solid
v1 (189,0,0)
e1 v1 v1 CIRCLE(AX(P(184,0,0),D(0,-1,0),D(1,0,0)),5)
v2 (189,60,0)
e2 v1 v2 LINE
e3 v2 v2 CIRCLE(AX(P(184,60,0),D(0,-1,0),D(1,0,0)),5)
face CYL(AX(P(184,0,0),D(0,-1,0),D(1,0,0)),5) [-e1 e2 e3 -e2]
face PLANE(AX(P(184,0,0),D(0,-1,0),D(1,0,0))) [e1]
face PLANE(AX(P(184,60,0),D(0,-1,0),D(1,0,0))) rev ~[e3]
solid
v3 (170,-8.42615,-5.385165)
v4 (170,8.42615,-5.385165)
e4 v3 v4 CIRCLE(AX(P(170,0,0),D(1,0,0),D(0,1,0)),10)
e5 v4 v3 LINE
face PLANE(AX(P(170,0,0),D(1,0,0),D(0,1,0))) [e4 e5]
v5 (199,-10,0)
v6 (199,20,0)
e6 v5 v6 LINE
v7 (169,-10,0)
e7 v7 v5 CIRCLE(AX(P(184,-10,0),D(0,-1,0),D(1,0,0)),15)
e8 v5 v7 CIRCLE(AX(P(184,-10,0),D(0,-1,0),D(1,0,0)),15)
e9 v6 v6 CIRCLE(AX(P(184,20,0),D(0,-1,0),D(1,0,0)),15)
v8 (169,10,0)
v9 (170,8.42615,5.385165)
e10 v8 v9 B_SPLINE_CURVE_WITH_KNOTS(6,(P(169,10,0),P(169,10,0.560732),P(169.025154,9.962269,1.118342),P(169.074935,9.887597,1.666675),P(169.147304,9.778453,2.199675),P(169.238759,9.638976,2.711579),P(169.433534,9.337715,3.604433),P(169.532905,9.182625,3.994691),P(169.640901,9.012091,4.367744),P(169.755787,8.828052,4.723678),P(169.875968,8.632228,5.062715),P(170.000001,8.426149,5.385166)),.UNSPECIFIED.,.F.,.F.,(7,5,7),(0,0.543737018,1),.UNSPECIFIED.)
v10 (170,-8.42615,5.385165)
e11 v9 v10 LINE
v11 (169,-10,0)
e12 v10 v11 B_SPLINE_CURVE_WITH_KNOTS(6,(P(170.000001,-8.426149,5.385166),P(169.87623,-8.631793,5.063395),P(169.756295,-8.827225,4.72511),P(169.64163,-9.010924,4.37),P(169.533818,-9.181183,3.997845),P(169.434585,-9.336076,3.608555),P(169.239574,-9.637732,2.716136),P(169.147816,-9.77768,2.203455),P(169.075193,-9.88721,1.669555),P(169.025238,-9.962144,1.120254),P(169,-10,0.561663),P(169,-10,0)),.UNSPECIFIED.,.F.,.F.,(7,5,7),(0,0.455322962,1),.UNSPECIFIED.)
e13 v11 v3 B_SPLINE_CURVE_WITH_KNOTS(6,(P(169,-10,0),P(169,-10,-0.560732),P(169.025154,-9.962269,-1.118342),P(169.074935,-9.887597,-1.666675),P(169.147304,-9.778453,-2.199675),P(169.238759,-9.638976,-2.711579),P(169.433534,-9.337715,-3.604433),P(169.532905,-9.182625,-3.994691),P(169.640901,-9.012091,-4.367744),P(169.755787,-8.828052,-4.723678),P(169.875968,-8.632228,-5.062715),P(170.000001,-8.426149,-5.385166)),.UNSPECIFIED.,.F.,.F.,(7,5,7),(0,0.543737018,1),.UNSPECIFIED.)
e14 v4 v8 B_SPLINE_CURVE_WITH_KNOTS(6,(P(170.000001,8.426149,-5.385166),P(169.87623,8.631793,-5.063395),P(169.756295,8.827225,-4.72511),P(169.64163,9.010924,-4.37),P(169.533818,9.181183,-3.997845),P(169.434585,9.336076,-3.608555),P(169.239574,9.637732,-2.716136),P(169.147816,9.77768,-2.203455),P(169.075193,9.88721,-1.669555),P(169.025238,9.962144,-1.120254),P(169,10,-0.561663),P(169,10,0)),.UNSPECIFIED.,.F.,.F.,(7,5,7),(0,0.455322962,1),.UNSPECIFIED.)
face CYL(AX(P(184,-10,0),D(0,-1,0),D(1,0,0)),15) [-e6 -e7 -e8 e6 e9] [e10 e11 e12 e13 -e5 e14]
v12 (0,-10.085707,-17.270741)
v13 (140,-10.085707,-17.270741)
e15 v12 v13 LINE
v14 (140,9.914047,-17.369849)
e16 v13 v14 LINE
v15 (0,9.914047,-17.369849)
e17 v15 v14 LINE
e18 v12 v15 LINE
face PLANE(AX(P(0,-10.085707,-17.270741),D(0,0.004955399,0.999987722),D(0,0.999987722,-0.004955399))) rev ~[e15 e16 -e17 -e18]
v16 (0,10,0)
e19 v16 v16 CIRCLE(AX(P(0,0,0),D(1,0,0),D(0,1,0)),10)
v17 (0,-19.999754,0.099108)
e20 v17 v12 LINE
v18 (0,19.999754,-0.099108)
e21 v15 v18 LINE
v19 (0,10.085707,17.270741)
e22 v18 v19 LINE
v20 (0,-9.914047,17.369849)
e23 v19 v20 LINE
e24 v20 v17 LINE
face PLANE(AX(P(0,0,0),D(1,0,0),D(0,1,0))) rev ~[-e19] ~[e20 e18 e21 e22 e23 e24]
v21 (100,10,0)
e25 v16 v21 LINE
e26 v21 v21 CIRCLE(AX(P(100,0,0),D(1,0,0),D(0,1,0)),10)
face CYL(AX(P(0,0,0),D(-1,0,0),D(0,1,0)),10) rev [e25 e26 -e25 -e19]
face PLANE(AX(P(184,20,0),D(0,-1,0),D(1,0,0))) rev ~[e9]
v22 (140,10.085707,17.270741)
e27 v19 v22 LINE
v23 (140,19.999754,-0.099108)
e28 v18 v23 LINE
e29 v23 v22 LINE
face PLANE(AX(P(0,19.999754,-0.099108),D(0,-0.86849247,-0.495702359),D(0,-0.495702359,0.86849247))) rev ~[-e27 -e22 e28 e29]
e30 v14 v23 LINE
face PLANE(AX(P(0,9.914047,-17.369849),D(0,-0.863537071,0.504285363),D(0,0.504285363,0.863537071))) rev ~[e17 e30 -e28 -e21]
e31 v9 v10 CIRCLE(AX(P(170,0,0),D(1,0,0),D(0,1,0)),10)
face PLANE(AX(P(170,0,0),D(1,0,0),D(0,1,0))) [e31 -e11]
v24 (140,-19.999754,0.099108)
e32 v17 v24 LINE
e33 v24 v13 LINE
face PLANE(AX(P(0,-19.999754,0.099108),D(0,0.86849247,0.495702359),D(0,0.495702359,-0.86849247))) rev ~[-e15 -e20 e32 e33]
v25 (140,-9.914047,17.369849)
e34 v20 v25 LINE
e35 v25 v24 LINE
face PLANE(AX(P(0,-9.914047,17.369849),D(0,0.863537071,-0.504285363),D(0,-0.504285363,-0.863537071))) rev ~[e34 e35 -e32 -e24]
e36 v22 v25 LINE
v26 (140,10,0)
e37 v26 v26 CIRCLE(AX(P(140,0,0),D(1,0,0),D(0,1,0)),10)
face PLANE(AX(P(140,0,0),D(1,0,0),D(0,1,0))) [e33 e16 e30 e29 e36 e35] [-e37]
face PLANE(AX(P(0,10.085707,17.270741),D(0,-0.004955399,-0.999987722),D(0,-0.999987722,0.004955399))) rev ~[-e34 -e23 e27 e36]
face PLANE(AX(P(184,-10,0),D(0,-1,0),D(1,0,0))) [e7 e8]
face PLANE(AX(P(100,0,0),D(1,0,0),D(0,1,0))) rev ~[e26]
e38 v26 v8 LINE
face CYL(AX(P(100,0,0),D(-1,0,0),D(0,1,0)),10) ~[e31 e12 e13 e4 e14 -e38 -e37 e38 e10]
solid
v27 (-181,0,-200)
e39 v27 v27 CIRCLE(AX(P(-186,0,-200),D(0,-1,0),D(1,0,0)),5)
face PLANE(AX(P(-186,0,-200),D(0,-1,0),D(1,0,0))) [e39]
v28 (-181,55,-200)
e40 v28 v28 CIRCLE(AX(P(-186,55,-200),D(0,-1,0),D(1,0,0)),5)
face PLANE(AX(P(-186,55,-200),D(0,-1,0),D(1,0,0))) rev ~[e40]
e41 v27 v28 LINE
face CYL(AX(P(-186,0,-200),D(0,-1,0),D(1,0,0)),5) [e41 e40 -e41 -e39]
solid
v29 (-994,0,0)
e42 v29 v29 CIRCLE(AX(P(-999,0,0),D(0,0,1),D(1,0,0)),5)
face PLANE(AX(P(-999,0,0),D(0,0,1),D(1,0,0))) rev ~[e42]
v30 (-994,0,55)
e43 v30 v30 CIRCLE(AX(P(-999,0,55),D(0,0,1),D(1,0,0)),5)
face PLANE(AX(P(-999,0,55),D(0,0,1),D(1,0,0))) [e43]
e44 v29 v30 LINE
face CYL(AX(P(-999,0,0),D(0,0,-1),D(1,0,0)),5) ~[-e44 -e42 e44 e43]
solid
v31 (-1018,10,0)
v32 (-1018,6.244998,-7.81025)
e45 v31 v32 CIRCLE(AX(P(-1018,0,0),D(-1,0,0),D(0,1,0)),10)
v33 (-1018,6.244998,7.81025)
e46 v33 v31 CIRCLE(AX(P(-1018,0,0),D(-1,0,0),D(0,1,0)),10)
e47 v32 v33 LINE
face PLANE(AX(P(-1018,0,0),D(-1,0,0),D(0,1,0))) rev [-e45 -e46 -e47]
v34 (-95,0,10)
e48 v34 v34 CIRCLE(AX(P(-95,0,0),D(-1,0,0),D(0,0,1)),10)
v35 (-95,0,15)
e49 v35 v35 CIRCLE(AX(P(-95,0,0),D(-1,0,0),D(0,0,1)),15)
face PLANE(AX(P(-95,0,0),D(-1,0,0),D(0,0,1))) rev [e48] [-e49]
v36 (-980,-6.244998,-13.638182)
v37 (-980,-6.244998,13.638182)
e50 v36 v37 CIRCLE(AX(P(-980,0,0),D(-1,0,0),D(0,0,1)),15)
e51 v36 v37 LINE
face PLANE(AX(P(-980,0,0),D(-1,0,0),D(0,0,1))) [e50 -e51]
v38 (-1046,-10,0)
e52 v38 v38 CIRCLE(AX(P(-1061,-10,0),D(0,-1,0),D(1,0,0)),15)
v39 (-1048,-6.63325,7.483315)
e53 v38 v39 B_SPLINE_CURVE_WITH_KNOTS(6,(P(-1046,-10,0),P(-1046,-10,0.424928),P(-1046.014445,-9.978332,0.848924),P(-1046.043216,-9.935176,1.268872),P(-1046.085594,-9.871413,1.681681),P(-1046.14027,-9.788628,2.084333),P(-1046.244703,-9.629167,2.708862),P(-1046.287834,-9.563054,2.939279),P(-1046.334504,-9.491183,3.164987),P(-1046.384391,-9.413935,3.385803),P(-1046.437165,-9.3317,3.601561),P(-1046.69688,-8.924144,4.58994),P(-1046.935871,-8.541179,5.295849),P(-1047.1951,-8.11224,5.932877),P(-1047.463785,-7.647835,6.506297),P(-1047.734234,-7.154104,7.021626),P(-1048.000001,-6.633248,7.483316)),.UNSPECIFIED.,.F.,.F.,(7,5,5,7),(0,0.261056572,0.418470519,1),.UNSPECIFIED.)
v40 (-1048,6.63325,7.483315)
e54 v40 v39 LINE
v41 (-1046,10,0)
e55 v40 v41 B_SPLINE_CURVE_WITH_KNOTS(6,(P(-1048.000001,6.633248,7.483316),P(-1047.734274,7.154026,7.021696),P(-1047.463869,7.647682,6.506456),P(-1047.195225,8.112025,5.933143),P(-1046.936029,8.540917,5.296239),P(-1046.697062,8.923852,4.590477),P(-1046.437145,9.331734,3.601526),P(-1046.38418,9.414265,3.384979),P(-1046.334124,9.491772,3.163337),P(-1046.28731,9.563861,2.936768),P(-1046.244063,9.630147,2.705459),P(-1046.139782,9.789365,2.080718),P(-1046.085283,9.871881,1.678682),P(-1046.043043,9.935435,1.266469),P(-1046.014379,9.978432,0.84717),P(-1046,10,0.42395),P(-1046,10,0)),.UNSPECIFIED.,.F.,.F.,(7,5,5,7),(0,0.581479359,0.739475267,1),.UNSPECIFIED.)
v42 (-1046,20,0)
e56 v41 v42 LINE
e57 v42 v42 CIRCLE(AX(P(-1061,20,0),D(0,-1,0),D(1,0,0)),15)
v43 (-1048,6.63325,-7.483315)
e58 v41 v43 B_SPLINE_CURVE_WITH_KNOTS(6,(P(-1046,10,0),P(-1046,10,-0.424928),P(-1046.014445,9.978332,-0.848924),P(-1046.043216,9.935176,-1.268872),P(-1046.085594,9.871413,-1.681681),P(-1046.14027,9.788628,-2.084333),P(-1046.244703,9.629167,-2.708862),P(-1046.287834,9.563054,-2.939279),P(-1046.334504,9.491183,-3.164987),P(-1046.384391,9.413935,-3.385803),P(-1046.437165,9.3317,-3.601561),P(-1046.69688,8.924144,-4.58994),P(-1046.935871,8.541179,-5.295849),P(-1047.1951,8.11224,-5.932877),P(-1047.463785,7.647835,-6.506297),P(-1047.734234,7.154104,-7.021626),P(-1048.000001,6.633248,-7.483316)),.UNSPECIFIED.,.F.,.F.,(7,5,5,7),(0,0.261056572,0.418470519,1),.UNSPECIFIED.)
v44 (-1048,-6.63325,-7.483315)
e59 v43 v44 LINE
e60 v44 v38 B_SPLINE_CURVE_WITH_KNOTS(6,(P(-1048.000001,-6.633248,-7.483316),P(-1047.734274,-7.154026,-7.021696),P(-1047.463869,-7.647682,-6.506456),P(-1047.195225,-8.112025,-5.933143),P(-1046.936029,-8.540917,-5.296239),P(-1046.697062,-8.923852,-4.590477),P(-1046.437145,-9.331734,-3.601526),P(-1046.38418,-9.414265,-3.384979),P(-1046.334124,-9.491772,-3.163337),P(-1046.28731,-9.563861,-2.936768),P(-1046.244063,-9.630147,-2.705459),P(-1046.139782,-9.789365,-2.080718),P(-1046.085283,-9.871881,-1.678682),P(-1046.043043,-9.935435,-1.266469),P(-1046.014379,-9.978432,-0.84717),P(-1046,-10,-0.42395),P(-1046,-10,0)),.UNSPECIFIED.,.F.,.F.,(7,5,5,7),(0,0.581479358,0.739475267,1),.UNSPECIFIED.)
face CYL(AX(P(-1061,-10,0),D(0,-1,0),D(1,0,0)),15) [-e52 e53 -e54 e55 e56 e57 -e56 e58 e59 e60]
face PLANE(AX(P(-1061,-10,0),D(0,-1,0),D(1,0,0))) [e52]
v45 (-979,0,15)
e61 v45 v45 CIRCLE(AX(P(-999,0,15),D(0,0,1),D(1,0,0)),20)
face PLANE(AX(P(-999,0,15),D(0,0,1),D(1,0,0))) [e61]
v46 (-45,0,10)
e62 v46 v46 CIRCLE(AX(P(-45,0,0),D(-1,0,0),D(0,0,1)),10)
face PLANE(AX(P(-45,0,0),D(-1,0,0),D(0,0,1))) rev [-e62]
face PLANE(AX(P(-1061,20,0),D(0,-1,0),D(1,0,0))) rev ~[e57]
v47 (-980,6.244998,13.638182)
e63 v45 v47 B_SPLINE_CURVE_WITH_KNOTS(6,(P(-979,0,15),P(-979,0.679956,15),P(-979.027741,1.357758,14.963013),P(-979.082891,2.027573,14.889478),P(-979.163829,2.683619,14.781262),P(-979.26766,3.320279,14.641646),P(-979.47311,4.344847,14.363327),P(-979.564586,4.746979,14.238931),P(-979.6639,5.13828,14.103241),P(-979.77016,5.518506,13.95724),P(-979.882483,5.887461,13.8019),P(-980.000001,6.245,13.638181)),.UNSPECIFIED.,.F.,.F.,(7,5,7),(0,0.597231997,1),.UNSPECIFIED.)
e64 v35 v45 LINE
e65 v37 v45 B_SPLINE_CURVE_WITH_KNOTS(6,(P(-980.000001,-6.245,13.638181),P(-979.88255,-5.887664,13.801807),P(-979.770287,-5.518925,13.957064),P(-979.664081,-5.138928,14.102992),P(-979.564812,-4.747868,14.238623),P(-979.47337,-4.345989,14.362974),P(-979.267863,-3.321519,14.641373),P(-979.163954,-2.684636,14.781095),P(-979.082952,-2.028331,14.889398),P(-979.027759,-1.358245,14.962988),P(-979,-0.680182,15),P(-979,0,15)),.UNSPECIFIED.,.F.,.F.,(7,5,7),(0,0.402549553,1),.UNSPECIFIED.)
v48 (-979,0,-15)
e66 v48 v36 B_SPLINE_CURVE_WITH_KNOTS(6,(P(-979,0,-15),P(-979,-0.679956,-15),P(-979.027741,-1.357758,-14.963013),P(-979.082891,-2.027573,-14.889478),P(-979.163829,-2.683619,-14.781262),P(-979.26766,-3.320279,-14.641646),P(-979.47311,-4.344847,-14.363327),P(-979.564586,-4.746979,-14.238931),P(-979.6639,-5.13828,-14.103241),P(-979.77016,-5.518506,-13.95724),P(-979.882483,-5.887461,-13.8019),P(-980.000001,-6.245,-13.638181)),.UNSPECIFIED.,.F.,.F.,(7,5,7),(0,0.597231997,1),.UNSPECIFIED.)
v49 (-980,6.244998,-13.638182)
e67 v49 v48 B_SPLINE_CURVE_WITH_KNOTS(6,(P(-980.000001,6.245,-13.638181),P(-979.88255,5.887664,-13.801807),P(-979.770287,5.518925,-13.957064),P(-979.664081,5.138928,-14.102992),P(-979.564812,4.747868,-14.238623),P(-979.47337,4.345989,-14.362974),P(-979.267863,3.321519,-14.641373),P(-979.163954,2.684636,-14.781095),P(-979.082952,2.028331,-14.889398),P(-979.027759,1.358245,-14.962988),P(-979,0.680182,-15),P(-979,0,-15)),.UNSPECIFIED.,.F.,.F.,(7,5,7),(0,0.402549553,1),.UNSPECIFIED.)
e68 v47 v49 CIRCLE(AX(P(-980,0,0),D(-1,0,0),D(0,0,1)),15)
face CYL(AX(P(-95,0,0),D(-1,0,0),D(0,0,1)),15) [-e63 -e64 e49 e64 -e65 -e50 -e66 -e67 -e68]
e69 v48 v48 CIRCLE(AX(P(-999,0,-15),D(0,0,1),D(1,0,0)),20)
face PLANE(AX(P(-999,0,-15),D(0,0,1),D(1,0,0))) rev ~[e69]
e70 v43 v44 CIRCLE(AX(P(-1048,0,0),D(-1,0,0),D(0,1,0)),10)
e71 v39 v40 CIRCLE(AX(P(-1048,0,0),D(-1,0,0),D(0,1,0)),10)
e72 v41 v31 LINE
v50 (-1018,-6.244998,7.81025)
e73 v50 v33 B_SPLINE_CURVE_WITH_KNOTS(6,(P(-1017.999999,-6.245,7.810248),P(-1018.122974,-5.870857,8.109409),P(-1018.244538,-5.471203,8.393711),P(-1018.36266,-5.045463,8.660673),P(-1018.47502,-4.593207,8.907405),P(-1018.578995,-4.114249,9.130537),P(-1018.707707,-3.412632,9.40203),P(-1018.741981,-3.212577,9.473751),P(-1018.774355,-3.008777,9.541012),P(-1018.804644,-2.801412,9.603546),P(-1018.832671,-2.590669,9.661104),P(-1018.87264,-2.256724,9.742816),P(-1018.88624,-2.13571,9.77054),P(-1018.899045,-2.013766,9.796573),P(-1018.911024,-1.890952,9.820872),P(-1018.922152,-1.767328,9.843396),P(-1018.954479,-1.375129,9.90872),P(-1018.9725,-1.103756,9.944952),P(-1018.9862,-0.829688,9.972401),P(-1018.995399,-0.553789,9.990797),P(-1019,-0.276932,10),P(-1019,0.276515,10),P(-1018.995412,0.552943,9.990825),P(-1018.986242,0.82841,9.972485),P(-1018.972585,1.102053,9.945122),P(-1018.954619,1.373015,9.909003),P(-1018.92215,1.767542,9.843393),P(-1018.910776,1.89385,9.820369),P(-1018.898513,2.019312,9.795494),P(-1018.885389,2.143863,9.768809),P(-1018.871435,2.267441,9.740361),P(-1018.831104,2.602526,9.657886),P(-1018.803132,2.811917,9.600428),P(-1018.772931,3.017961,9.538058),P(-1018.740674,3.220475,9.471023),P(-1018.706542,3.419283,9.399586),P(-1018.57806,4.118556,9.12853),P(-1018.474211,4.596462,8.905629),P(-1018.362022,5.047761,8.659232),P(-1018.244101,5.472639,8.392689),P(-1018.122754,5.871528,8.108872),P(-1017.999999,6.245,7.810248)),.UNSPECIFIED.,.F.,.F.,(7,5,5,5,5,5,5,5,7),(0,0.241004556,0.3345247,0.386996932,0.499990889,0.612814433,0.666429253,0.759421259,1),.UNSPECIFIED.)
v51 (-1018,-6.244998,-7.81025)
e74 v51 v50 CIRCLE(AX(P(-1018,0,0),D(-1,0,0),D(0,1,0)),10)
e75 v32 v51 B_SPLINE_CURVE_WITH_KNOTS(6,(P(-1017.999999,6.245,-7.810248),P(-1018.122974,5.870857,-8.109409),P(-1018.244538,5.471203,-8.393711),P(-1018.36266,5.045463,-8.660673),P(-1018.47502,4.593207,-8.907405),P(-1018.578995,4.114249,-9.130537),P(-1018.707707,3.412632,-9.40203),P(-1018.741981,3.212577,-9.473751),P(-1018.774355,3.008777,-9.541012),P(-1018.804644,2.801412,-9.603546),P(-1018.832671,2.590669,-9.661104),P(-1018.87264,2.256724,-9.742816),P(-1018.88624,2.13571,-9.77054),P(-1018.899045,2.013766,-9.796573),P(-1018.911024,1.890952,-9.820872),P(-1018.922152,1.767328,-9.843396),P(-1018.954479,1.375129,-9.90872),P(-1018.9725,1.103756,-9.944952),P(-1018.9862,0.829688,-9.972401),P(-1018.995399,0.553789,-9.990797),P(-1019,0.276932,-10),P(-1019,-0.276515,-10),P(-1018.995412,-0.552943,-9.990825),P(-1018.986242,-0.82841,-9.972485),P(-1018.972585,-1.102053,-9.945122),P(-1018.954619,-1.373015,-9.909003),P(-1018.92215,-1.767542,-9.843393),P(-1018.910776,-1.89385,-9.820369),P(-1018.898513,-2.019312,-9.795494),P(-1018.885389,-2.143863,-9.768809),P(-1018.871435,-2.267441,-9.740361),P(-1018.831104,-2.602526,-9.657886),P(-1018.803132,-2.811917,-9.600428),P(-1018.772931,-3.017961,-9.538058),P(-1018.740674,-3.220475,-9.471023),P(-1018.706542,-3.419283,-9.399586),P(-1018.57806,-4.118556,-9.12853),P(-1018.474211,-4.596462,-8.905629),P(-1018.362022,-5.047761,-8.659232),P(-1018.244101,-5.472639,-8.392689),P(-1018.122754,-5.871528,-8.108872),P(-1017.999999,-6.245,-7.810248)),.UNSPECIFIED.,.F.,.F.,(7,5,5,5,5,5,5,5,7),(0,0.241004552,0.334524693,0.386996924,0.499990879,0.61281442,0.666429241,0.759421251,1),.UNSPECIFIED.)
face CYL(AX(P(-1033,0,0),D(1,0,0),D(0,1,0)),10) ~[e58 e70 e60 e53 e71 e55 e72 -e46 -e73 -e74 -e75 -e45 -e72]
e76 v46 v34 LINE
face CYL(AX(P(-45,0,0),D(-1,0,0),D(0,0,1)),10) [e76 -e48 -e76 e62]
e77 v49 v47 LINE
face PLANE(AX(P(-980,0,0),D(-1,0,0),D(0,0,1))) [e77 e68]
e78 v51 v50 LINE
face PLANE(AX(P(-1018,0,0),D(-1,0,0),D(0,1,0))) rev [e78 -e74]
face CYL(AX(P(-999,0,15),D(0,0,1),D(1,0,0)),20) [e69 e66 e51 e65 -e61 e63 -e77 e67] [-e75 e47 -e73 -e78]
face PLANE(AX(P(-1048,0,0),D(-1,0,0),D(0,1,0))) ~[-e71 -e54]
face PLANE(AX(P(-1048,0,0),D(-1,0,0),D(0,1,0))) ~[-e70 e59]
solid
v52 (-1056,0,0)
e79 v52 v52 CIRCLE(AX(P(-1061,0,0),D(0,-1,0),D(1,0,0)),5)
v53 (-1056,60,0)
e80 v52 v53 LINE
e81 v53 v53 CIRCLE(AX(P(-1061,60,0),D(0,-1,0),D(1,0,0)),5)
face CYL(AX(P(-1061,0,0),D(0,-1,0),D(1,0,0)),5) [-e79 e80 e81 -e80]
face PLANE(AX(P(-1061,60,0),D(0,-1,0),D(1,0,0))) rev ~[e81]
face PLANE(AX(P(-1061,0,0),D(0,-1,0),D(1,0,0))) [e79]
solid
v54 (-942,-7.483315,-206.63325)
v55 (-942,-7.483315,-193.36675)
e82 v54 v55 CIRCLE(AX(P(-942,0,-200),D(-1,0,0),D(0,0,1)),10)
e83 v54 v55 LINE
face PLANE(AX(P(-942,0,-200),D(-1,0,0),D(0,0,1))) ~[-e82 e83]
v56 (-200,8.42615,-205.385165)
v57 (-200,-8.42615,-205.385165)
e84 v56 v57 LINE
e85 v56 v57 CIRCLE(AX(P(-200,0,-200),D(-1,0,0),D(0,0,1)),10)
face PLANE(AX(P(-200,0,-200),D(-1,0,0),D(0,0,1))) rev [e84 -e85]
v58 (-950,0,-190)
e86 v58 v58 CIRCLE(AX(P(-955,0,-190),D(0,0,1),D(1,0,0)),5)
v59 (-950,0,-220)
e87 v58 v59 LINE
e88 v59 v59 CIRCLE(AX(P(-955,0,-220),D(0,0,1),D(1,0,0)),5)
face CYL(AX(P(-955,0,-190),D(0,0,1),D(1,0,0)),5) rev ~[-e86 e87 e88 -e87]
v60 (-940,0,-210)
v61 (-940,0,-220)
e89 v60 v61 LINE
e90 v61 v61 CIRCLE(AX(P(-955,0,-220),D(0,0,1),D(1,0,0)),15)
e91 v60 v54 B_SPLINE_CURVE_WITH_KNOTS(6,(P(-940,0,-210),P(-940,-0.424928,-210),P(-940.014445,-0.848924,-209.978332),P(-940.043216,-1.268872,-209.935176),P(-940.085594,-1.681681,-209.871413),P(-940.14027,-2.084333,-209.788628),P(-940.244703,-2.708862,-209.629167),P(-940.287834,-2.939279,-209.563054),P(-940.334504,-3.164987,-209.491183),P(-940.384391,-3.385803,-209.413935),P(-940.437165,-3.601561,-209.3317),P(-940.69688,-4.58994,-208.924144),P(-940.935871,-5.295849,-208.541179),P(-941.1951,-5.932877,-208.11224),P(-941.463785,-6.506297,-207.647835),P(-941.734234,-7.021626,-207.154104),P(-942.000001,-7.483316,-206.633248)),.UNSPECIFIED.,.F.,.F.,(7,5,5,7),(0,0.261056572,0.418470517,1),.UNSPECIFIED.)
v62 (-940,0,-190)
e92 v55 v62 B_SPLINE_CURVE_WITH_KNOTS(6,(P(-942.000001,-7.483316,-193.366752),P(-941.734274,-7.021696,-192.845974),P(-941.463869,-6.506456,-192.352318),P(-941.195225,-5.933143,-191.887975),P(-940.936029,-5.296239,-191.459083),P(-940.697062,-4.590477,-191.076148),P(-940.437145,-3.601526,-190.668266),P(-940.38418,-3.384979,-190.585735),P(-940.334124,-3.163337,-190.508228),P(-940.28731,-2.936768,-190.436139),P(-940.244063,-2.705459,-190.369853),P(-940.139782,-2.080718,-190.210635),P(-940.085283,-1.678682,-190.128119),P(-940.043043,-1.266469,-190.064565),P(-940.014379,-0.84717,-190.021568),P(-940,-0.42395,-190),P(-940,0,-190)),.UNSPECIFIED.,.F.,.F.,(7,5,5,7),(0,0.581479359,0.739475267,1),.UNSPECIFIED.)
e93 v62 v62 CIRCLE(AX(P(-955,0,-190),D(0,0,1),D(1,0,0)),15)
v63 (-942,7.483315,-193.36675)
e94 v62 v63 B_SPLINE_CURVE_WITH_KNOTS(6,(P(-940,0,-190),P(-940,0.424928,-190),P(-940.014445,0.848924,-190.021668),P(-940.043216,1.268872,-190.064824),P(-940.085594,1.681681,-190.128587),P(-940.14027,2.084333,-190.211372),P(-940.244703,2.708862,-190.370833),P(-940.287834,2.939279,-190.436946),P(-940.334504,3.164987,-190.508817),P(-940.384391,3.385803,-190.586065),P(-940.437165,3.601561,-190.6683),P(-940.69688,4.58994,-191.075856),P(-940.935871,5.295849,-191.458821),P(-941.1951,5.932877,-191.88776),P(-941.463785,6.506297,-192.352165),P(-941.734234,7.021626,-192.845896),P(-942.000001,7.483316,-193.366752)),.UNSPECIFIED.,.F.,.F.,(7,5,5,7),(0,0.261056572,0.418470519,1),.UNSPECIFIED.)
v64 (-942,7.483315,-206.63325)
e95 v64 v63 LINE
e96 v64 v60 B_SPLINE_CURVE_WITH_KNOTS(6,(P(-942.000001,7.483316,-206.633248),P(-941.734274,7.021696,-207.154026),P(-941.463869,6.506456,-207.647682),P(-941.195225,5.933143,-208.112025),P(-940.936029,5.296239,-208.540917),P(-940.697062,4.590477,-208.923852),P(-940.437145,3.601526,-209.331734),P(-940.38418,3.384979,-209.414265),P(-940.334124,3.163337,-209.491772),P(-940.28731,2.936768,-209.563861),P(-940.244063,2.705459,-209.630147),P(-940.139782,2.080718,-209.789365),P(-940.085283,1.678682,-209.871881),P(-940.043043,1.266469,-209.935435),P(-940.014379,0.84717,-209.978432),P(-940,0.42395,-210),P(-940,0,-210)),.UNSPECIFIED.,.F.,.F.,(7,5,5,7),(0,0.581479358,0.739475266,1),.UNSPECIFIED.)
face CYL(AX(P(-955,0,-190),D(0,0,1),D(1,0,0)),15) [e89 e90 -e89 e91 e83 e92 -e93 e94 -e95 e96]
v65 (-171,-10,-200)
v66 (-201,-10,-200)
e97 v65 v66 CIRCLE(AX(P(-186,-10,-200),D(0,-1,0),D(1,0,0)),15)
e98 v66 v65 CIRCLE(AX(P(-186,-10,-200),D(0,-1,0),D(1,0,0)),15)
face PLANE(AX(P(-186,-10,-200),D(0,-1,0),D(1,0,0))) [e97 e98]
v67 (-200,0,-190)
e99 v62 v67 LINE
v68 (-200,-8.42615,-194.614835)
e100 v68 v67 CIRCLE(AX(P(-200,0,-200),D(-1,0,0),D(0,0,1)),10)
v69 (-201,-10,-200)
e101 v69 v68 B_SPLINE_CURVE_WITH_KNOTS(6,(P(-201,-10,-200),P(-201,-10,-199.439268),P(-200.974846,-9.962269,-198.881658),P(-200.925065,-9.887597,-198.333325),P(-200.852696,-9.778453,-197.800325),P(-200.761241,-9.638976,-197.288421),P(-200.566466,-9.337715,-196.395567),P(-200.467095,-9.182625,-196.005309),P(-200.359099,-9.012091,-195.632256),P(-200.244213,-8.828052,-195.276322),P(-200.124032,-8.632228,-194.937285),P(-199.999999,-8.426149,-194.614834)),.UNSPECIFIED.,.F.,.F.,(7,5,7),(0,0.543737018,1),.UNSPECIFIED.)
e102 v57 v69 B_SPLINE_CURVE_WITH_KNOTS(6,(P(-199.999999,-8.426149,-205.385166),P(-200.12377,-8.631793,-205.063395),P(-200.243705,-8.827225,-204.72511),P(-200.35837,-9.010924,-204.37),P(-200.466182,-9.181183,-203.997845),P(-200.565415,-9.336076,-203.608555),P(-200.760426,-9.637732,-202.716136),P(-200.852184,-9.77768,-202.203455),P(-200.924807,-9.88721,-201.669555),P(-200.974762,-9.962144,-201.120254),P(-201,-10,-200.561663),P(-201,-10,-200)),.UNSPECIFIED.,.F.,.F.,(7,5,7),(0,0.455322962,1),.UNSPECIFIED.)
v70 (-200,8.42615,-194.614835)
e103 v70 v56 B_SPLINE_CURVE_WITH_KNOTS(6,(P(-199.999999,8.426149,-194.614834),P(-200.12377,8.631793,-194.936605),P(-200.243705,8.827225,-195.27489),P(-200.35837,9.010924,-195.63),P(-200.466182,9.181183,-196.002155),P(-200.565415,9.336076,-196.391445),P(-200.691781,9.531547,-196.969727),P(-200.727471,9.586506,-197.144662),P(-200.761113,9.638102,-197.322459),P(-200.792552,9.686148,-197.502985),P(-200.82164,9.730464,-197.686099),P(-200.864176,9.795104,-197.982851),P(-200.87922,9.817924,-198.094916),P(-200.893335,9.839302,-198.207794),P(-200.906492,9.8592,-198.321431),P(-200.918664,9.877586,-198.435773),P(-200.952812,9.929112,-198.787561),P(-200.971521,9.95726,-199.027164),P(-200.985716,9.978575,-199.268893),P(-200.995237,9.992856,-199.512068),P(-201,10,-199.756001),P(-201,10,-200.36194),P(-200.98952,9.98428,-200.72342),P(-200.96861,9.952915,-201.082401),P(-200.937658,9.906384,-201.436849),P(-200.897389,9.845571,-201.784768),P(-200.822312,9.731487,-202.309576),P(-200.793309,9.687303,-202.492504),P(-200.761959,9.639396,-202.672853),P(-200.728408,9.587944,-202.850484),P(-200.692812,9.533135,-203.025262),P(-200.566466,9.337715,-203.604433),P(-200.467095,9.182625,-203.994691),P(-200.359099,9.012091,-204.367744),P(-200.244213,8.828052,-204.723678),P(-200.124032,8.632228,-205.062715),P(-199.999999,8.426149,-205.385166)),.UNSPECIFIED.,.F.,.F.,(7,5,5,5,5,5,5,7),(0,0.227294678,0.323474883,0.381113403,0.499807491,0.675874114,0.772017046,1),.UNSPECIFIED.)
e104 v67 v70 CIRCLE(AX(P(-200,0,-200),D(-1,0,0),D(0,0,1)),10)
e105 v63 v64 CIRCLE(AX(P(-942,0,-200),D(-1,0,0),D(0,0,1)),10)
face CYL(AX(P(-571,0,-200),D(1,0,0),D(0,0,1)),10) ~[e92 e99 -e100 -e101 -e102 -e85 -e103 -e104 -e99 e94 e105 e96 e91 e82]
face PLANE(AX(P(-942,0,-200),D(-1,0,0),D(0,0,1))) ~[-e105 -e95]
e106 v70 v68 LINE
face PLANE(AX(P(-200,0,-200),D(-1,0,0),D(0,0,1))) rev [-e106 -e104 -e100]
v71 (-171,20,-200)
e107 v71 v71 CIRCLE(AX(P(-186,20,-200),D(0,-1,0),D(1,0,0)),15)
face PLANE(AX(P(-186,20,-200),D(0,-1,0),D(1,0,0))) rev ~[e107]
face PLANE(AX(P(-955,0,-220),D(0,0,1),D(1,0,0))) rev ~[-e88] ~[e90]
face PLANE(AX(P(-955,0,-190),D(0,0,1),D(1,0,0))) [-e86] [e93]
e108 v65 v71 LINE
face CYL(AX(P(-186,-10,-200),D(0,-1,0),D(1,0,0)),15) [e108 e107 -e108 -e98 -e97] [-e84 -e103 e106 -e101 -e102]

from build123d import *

# Parameters (mm, degrees)
F0_R      = 10
F1_DEPTH  = 140
F3_R      = 10
F4_DEPTH  = 70
F7_DEPTH  = 30
F9_DEPTH  = 60
F13_R     = 20
F14_DEPTH = 30
F15_R     = 5
F16_DEPTH = 55
F17_W     = 30
F17_H     = 10
F19_R     = 15
F20_DEPTH = 30
F21_R     = 5
F22_DEPTH = 60
F23_W     = 742
F23_H     = 10
F25_R     = 15
F26_DEPTH = 30
F27_R     = 5
F28_DEPTH = 55
F30_R     = 15
F30_R_2   = 5
F31_DEPTH = 30


with BuildPart() as f1:
    # F0 (on Right) → F1 (new body)
    with BuildSketch(Plane.YZ):
        Polygon((19.9997544387, -0.0991079843), (10.0857072515, 17.2707414212), (-9.9140471872, 17.3698494055), (-19.9997544387, 0.0991079843), (-10.0857072515, -17.2707414212), (9.9140471872, -17.3698494055), align=None)
        Circle(F0_R, mode=Mode.SUBTRACT)
    extrude(amount=F1_DEPTH)

    # F3 (on offset) → F4 (join)
    with BuildSketch(Plane.YZ.offset(100)):
        Circle(F3_R)
    extrude(amount=F4_DEPTH)

    # F6 (on offset) → F7 (join)
    with BuildSketch(Plane.XZ.offset(10)):
        with BuildLine():
            ThreePointArc((169, 0), (184, -15), (199, 0))
            ThreePointArc((199, 0), (184, 15), (169, 0))
        make_face()
    extrude(amount=-F7_DEPTH)


with BuildPart() as f9:
    # F8 (on Front) → F9 (new body)
    with BuildSketch(Plane.XZ):
        with BuildLine():
            ThreePointArc((179, 0), (184, -5), (189, 0))
            ThreePointArc((189, 0), (184, 5), (179, 0))
        make_face()
    extrude(amount=-F9_DEPTH)


with BuildPart() as f11:
    # F10 (on Front) → F11 (revolve)
    with BuildSketch(Plane.XZ):
        Polygon((-980, 0), (-45, 0), (-45, 10), (-95, 10), (-95, 15), (-980, 15), align=None)
    revolve(axis=Axis((-512.5, 0, 0), (-1, 0, 0)))

    # F13 (on offset) → F14 (join)
    with BuildSketch(Plane.XY.offset(15)):
        with Locations((-999, 0)):
            Circle(F13_R)
    extrude(amount=-F14_DEPTH)

    # F17 (on Top) → F18 (revolve)
    with BuildSketch(Plane.XY):
        with Locations((-1033, 5)):
            Rectangle(F17_W, F17_H)
    revolve(axis=Axis((-1033, 0, 0), (-1, 0, 0)))

    # F19 (on offset) → F20 (join)
    with BuildSketch(Plane.XZ.offset(10)):
        with Locations((-1061, 0)):
            Circle(F19_R)
    extrude(amount=-F20_DEPTH)


with BuildPart() as f16:
    # F15 (on Top) → F16 (new body)
    with BuildSketch(Plane.XY):
        with Locations((-999, 0)):
            Circle(F15_R)
    extrude(amount=F16_DEPTH)


with BuildPart() as f22:
    # F21 (on Front) → F22 (new body)
    with BuildSketch(Plane.XZ):
        with Locations((-1061, 0)):
            Circle(F21_R)
    extrude(amount=-F22_DEPTH)


with BuildPart() as f24:
    # F23 (on Front) → F24 (revolve)
    with BuildSketch(Plane.XZ):
        with Locations((-571, -195)):
            Rectangle(F23_W, F23_H)
    revolve(axis=Axis((-571, 0, -200), (-1, 0, 0)))

    # F25 (on offset) → F26 (join)
    with BuildSketch(Plane.XZ.offset(10)):
        with Locations((-186, -200)):
            Circle(F25_R)
    extrude(amount=-F26_DEPTH)

    # F30 (on offset) → F31 (join)
    with BuildSketch(Plane.XY.offset(-190)):
        with Locations((-955, 0)):
            Circle(F30_R)
        with Locations((-955, 0)):
            Circle(F30_R_2, mode=Mode.SUBTRACT)
    extrude(amount=-F31_DEPTH)


with BuildPart() as f28:
    # F27 (on Front) → F28 (new body)
    with BuildSketch(Plane.XZ):
        with Locations((-186, -200)):
            Circle(F27_R)
    extrude(amount=-F28_DEPTH)


solid = Compound([f1.part, f9.part, f11.part, f16.part, f22.part, f24.part, f28.part])
